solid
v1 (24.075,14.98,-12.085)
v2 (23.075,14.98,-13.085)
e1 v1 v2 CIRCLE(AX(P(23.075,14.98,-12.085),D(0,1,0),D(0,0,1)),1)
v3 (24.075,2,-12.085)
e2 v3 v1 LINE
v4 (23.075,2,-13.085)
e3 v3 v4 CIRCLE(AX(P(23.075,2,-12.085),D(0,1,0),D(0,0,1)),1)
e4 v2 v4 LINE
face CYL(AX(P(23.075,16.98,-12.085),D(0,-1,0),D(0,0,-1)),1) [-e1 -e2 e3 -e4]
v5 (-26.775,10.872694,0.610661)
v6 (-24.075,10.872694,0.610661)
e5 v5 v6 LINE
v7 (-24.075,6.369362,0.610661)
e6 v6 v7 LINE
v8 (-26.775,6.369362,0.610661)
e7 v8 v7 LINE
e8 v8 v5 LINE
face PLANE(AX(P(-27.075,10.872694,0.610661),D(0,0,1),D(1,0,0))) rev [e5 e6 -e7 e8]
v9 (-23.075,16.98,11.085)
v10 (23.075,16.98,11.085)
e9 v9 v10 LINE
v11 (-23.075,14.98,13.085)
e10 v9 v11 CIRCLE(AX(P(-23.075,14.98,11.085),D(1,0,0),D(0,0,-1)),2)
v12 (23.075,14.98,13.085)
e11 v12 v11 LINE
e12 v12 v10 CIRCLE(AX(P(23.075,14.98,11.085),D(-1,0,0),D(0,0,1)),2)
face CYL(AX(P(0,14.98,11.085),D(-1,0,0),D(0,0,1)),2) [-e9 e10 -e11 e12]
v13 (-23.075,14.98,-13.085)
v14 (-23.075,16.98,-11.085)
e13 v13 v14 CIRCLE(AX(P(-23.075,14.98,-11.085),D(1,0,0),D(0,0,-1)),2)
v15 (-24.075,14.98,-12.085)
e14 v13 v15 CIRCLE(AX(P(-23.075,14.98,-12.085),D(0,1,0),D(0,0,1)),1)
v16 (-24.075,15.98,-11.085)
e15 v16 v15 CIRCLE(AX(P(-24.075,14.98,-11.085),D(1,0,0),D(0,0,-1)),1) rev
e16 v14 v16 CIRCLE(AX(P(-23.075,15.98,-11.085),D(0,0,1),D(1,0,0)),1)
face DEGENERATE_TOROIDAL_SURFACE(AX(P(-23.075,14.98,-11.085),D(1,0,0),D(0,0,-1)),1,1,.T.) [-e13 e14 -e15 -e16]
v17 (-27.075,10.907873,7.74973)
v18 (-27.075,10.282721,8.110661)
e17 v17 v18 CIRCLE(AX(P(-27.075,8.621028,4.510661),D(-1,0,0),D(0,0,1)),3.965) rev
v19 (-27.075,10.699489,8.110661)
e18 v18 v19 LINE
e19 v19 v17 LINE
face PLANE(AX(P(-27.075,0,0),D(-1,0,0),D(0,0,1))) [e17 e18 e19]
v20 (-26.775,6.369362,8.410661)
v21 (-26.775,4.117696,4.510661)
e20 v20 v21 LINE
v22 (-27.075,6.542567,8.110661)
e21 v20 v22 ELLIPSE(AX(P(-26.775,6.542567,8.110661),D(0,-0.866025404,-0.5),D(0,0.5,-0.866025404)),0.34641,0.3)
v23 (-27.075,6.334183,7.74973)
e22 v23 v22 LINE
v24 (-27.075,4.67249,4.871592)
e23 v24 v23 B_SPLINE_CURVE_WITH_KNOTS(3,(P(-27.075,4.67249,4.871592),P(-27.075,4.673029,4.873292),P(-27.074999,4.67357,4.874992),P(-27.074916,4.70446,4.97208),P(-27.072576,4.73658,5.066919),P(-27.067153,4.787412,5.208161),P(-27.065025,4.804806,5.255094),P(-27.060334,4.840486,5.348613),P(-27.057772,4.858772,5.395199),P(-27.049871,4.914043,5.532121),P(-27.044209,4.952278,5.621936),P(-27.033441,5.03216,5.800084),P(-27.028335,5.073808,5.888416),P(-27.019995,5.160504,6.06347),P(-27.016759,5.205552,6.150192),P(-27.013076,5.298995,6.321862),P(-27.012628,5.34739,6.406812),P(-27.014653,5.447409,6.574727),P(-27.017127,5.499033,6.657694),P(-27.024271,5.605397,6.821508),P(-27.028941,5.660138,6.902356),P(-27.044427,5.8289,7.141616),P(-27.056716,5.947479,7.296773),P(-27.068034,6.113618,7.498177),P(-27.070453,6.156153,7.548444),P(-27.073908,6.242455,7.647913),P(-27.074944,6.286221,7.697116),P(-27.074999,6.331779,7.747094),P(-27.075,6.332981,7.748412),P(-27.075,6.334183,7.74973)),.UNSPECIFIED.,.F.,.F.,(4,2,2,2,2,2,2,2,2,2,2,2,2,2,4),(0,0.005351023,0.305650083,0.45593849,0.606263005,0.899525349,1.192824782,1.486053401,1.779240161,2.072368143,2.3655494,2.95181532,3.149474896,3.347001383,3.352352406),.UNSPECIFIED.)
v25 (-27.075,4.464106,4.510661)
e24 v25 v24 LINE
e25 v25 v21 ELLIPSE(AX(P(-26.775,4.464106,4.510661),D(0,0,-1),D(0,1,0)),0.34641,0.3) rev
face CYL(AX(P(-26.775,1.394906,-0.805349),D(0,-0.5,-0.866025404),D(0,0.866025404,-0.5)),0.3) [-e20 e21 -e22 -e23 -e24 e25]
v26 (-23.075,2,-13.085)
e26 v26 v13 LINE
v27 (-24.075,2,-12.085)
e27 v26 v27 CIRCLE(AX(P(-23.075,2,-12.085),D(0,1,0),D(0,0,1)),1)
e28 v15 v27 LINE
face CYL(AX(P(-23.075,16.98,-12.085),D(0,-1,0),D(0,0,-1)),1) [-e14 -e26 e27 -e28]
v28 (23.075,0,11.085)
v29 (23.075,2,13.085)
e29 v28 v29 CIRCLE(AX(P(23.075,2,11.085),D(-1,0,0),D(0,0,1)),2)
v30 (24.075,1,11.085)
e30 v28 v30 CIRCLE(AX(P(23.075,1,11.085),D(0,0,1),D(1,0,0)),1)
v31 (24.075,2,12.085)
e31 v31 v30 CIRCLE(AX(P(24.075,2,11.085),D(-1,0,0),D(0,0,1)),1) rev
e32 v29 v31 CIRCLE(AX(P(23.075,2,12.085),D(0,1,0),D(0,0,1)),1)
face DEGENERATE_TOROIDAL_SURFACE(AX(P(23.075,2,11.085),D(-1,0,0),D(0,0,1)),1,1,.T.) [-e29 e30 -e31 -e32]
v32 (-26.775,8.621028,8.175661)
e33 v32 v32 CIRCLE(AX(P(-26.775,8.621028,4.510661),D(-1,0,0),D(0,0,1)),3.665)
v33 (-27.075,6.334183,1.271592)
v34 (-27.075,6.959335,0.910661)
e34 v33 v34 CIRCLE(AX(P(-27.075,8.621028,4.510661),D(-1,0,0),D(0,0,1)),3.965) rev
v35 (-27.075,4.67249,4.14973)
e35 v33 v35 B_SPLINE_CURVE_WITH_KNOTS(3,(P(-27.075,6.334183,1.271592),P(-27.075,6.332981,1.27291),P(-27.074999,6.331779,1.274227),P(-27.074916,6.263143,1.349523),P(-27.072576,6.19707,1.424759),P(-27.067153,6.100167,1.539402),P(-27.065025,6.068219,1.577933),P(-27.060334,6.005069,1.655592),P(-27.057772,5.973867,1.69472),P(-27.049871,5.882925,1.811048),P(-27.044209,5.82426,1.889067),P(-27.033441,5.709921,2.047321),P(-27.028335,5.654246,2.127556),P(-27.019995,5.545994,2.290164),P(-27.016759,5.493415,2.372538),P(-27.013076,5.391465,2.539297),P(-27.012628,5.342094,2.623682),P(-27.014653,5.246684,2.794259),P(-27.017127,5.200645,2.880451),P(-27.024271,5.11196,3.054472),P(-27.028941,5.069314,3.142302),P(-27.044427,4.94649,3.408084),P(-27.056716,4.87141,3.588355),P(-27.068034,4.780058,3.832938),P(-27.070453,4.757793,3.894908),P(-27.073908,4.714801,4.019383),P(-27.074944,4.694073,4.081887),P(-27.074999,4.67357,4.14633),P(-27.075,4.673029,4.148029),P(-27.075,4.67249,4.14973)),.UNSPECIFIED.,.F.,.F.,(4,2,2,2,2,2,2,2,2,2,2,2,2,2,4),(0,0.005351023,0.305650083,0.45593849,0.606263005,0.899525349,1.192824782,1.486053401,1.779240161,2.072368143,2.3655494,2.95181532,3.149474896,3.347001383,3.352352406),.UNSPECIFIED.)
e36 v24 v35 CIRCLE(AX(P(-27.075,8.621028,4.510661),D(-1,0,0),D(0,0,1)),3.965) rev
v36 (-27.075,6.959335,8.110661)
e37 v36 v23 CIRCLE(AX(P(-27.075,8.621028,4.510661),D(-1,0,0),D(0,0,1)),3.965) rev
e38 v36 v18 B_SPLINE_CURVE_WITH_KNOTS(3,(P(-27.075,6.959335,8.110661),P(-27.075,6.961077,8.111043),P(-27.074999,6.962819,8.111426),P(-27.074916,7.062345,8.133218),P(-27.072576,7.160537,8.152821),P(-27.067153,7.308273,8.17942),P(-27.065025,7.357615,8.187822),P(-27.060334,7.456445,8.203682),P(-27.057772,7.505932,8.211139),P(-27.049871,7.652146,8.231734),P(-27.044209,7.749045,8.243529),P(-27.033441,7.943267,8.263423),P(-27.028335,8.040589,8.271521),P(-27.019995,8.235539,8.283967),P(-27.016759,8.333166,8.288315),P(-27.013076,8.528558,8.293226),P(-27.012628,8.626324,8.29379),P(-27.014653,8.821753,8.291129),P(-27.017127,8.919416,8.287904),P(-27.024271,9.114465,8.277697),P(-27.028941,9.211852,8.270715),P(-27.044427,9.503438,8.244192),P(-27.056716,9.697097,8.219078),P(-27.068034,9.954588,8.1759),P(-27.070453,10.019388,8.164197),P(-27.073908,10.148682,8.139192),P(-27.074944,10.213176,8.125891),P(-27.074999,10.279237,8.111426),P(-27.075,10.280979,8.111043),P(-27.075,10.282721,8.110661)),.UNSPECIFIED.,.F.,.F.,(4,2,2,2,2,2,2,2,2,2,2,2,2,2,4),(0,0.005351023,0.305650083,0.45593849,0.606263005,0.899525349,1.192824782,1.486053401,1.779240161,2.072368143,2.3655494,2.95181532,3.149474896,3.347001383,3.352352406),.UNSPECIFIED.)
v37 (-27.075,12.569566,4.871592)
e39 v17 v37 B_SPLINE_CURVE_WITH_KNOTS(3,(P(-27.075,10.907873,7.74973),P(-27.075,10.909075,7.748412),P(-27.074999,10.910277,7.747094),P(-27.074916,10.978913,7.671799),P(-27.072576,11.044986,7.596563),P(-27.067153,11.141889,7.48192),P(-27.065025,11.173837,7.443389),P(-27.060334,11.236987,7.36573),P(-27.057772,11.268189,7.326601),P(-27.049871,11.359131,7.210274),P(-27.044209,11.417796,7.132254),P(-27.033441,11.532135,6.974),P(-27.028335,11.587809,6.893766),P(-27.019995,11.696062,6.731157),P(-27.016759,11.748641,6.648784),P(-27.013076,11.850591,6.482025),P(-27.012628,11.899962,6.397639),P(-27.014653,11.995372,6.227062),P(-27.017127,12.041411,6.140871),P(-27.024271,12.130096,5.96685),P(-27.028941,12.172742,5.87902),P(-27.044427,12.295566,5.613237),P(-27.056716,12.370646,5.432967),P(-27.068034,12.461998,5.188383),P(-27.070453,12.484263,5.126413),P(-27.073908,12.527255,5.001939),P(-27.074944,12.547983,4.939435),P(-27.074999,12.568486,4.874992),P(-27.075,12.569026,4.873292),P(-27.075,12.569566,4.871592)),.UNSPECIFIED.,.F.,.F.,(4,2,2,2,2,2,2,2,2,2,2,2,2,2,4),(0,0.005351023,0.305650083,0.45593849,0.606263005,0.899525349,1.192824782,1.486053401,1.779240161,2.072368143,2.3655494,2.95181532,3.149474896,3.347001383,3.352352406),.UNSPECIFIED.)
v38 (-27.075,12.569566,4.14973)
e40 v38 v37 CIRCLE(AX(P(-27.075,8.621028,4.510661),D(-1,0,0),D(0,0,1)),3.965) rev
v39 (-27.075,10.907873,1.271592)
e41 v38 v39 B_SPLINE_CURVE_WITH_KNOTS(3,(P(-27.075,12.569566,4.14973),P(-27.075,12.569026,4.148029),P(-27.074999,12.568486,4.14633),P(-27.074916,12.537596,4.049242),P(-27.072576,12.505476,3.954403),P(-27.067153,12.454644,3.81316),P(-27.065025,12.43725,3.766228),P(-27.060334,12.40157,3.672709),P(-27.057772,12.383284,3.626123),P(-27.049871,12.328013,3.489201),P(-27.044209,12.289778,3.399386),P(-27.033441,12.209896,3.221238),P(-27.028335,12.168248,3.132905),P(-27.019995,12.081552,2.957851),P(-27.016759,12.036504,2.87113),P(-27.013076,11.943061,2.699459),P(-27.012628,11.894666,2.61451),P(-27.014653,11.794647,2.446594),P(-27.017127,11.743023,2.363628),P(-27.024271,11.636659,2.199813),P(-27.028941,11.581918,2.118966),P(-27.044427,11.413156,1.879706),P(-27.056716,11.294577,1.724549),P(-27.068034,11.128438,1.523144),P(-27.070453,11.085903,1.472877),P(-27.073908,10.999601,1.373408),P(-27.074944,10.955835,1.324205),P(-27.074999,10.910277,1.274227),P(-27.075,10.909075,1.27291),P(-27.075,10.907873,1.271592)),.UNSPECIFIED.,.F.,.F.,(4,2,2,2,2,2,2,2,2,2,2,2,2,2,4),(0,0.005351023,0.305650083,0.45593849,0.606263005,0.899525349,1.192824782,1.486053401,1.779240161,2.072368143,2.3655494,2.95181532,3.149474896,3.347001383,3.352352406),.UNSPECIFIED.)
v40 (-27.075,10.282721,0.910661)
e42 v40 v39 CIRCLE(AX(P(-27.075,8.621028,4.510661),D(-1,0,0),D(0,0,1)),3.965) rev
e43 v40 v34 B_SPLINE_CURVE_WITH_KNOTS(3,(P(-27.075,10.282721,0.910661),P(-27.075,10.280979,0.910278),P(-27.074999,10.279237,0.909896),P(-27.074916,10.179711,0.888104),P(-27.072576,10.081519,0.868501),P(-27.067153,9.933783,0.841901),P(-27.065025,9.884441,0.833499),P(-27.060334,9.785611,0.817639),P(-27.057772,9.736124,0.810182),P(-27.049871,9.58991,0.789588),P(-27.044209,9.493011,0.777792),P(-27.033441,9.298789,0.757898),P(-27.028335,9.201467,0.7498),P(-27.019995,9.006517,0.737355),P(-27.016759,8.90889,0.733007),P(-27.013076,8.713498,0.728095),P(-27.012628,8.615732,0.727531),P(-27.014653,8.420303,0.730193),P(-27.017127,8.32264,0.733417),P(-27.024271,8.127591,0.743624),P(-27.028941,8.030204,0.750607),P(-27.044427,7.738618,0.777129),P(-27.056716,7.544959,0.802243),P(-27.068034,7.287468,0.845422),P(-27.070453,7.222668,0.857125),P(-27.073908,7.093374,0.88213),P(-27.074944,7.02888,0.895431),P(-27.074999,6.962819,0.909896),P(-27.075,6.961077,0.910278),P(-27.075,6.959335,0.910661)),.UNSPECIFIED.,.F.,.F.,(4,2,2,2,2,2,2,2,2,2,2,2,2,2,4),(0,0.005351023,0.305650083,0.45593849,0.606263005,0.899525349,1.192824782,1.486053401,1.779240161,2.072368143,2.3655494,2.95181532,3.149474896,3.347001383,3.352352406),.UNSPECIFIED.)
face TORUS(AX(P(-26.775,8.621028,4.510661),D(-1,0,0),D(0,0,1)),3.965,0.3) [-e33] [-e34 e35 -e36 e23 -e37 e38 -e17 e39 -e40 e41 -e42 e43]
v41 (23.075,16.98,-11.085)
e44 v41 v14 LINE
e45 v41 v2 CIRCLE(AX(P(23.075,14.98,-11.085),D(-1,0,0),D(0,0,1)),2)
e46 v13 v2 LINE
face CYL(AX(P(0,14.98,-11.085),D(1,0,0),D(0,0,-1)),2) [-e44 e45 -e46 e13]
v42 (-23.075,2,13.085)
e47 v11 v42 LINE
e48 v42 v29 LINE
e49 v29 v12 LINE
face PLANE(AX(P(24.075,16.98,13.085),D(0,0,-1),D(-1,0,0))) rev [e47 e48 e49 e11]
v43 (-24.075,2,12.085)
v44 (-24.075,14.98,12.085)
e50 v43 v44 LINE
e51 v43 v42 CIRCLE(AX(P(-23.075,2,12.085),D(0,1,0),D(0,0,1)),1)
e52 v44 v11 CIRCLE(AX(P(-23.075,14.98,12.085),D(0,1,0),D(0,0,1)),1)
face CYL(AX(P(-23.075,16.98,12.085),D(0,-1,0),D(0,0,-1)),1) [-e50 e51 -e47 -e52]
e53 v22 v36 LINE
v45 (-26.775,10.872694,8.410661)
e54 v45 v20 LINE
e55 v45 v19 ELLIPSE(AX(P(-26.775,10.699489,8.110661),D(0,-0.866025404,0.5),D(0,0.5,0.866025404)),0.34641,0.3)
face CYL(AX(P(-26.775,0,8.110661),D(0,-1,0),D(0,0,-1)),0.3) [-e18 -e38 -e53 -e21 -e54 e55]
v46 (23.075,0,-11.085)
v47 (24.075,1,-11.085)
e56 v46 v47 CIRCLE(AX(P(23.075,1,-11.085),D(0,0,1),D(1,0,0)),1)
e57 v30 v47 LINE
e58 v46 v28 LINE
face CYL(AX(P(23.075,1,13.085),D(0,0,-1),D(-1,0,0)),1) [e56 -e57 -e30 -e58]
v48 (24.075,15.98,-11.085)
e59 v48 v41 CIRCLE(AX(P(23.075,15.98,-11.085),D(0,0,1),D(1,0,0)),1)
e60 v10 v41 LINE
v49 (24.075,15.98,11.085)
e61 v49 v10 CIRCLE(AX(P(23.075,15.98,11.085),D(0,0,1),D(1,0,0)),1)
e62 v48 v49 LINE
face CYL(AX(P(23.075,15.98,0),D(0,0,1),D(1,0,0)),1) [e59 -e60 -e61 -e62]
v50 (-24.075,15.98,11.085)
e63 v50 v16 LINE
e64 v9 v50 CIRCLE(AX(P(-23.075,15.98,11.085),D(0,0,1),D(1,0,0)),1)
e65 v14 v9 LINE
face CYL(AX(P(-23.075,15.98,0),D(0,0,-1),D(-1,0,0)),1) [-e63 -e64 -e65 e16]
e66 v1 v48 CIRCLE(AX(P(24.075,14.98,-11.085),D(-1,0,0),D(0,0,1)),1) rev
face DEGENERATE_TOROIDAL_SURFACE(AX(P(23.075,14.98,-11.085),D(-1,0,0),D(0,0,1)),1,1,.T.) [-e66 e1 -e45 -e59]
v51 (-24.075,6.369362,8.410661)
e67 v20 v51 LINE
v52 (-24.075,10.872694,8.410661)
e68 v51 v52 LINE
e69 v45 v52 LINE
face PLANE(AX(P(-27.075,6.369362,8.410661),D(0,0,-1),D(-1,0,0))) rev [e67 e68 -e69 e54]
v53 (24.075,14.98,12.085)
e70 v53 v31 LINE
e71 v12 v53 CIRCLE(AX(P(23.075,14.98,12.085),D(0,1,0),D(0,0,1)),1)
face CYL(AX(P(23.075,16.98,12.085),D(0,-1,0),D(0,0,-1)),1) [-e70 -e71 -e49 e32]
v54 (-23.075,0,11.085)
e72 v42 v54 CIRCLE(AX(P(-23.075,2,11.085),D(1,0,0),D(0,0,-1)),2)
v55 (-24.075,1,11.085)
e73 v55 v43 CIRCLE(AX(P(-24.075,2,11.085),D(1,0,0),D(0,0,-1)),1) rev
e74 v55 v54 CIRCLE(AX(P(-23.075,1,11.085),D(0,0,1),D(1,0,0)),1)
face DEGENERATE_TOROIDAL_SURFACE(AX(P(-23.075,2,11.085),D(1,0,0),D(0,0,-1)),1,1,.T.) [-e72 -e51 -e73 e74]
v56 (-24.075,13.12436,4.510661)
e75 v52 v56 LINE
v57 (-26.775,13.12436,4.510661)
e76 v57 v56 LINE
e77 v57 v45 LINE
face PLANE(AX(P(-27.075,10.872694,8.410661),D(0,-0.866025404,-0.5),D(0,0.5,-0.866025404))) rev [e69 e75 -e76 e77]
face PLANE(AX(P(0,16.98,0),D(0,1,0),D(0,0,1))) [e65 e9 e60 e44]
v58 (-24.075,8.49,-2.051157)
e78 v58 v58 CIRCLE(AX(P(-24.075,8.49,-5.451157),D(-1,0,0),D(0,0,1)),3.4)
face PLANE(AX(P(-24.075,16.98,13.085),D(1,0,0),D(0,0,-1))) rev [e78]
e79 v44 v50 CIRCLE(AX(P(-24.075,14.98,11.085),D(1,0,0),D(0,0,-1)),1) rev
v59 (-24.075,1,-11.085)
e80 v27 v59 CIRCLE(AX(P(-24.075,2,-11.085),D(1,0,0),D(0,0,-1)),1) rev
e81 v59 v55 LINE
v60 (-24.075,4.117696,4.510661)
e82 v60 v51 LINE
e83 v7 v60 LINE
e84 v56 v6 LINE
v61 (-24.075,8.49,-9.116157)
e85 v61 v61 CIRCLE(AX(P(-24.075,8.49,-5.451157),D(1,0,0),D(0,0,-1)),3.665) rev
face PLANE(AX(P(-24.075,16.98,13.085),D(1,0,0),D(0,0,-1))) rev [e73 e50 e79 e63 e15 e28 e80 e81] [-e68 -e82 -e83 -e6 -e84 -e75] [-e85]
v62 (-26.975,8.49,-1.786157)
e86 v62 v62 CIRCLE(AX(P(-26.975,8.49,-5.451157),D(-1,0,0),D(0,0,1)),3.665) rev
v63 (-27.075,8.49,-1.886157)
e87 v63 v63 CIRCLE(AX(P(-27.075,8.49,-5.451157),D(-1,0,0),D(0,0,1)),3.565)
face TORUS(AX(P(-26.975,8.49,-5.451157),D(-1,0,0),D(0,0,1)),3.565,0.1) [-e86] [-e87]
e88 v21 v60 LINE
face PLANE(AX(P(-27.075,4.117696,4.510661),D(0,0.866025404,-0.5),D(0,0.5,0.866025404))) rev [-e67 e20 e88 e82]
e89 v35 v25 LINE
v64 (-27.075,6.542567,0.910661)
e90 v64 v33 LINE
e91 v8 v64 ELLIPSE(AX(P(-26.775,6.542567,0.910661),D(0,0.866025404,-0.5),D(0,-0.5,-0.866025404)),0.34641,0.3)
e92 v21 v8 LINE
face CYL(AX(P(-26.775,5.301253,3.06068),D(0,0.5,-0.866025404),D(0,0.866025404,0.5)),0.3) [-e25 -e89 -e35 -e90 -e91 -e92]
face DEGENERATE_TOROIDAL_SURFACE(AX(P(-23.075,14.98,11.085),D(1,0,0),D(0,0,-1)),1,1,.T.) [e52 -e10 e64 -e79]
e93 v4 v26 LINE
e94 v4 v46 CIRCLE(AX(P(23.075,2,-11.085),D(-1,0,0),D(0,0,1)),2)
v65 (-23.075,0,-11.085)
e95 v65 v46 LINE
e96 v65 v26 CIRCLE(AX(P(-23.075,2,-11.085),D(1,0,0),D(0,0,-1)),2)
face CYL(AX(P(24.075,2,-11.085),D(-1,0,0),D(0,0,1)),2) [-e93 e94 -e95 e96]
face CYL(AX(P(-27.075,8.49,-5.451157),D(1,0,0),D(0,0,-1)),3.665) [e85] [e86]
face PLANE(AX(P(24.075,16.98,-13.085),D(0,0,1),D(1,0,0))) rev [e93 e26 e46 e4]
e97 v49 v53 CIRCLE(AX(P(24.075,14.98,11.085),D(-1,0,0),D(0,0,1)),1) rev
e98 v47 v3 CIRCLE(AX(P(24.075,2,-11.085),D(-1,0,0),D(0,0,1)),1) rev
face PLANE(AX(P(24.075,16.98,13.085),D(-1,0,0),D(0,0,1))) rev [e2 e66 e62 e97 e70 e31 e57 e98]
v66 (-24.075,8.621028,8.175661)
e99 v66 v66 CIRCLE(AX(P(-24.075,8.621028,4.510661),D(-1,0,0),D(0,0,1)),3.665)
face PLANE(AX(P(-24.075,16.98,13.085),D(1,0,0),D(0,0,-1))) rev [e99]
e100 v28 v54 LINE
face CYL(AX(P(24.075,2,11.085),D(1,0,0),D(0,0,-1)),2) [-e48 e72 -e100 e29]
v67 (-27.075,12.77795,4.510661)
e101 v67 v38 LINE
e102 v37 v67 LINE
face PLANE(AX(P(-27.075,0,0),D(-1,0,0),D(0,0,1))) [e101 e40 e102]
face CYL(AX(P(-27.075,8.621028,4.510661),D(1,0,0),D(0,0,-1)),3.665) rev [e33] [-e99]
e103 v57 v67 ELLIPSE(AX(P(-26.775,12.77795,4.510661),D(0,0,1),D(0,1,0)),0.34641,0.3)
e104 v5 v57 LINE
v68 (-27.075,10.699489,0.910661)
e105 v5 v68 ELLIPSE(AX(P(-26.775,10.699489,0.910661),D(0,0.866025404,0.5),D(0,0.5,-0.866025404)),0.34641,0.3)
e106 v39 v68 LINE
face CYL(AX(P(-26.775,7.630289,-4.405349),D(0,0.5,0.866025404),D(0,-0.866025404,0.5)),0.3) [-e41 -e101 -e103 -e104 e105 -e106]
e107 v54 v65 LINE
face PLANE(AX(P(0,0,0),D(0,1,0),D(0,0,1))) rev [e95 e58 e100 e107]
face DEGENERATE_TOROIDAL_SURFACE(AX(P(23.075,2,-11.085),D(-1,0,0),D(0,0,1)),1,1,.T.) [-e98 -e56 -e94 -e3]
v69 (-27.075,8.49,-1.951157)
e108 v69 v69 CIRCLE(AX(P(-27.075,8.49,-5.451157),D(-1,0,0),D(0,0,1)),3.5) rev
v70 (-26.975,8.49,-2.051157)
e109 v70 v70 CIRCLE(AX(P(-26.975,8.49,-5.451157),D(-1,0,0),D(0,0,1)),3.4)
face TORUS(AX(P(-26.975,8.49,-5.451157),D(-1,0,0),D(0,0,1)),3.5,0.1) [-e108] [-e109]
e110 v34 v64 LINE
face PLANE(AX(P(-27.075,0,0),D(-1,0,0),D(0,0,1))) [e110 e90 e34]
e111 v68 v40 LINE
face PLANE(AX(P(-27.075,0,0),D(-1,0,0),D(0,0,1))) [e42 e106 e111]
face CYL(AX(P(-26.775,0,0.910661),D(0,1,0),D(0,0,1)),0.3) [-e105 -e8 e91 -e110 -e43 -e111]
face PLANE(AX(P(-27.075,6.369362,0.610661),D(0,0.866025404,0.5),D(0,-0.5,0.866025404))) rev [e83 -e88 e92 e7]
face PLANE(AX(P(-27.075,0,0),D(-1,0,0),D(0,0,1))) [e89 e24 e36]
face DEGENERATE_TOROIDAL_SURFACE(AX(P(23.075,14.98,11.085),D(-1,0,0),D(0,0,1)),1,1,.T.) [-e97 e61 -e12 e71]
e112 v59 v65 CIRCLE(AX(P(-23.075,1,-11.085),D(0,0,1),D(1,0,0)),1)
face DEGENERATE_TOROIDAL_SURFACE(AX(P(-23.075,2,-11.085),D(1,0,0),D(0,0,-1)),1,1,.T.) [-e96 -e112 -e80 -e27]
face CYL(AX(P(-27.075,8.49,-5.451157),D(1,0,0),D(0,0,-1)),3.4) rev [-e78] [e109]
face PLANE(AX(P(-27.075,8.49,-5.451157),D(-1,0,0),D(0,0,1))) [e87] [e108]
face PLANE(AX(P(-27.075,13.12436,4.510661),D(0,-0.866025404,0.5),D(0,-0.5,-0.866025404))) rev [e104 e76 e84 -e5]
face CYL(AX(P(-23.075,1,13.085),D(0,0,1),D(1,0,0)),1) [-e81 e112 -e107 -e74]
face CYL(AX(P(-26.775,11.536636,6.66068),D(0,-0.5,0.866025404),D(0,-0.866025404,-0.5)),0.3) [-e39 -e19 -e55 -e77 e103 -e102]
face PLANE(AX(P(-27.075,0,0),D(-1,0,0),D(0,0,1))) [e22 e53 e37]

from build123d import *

# Parameters (mm, degrees)
SKETCH1_W           = 48.15
SKETCH1_H           = 26.17
BOSS_EXTRUDE1_DEPTH = 16.98
FILLET1_R           = 2
FILLET2_R           = 1
SKETCH2_R           = 3.665
SKETCH2_R_2         = 3.4
BOSS_EXTRUDE2_DEPTH = 3
FILLET6_R           = 0.3
FILLET10_R          = 0.1


with BuildPart() as part:
    # Sketch1 → Boss-Extrude1 (new body)
    with BuildSketch(Plane(origin=(0, 0, 0), x_dir=(1, 0, 0), z_dir=(0, 1, 0))):
        Rectangle(SKETCH1_W, SKETCH1_H)
    extrude(amount=BOSS_EXTRUDE1_DEPTH)

    # Fillet1
    fillet1_edges = [part.edges().sort_by_distance(p)[0] for p in [
        (0, 16.98, -13.085),
        (0, 0, -13.085),
        (0, 0, 13.085),
        (0, 16.98, 13.085),
    ]]
    fillet(fillet1_edges, radius=FILLET1_R)

    # Fillet2
    fillet2_edges = [part.edges().sort_by_distance(p)[0] for p in [
        (-24.075, 8.49, -13.085),
        (24.075, 8.49, -13.085),
        (-24.075, 0, 0),
        (-24.075, 8.49, 13.085),
        (-24.075, 16.98, 0),
        (-24.075, 16.394213562, 12.499213562),
        (-24.075, 16.394213562, -12.499213562),
        (-24.075, 0.585786438, 12.499213562),
        (-24.075, 0.585786438, -12.499213562),
        (24.075, 0, 0),
        (24.075, 16.98, 0),
        (24.075, 8.49, 13.085),
        (24.075, 16.394213562, 12.499213562),
        (24.075, 16.394213562, -12.499213562),
        (24.075, 0.585786438, 12.499213562),
        (24.075, 0.585786438, -12.499213562),
    ]]
    fillet(fillet2_edges, radius=FILLET2_R)

    # Sketch2 → Boss-Extrude2 (add)
    # profile 1 of 2: a face of its own
    with BuildSketch(Plane.ZY.offset(24.075)):
        with Locations(Location((-5.451156858, 8.49, 0), (0, 0, 180))):
            Circle(SKETCH2_R)
        with Locations((-5.451156858, 8.49)):
            Circle(SKETCH2_R_2, mode=Mode.SUBTRACT)
    # profile 2 of 2: a face of its own
    with BuildSketch(Plane.ZY.offset(24.075)):
        Polygon((4.510660825, 13.124360065), (0.610660825, 10.872694015), (0.610660825, 6.369361915), (4.510660825, 4.117695866), (8.410660825, 6.369361915), (8.410660825, 10.872694015), align=None)
        with Locations((4.510660825, 8.621027965)):
            Circle(SKETCH2_R, mode=Mode.SUBTRACT)
    extrude(amount=BOSS_EXTRUDE2_DEPTH)

    # Fillet6
    # the kernel refuses this fillet: 0.3 mm, written as the material it takes off along each edge
    with BuildSketch(Plane(origin=(-27.075, 8.621027965, 4.510660825), x_dir=(0, 0, 1), z_dir=(0, -1, 0))) as fillet6_piece_1:
        with BuildLine():
            CenterArc((3.665 + FILLET6_R, -FILLET6_R), FILLET6_R, 90, 90)
            Line((3.665, -FILLET6_R), (3.665, 0))
            Line((3.665, 0), (3.665 + FILLET6_R, 0))
        make_face()
    revolve(axis=Axis((-27.075, 8.621027965, 4.510660825), (-1, 0, 0)), mode=Mode.SUBTRACT)
    with BuildSketch(Plane(origin=(-27.075, 10.497694015, 9.060179878), x_dir=(1, 0, 0), z_dir=(0, 0.5000000000000002, -0.8660254037844386)), Plane(origin=(-27.075, 13.499360065, 5.160179878), x_dir=(1, 0, 0), z_dir=(0, -0.5000000000000002, -0.8660254037844386)), Plane(origin=(-27.075, 11.622694015, 0.610660825), x_dir=(1, 0, 0), z_dir=(0, -1, 0)), Plane(origin=(-27.075, 6.744361915, -0.038858228), x_dir=(1, 0, 0), z_dir=(0, -0.5000000000000002, 0.8660254037844386)), Plane(origin=(-27.075, 3.742695866, 3.861141772), x_dir=(1, 0, 0), z_dir=(0, 0.49999999999999983, 0.8660254037844388)), Plane(origin=(-27.075, 5.619361915, 8.410660825), x_dir=(1, 0, 0), z_dir=(0, 1, 0))) as fillet6_piece_2:
        with BuildLine():
            CenterArc((FILLET6_R, FILLET6_R), FILLET6_R, 180, 90)
            Line((0, FILLET6_R), (0, 0))
            Line((0, 0), (FILLET6_R, 0))
        make_face()
    extrude(amount=6.0033321, mode=Mode.SUBTRACT)

    # Fillet10
    fillet10_edges = [part.edges().sort_by_distance(p)[0] for p in [
        (-27.075, 8.49, -1.786156858),
        (-27.075, 8.49, -8.851156858),
    ]]
    fillet(fillet10_edges, radius=FILLET10_R)


solid = part.part
